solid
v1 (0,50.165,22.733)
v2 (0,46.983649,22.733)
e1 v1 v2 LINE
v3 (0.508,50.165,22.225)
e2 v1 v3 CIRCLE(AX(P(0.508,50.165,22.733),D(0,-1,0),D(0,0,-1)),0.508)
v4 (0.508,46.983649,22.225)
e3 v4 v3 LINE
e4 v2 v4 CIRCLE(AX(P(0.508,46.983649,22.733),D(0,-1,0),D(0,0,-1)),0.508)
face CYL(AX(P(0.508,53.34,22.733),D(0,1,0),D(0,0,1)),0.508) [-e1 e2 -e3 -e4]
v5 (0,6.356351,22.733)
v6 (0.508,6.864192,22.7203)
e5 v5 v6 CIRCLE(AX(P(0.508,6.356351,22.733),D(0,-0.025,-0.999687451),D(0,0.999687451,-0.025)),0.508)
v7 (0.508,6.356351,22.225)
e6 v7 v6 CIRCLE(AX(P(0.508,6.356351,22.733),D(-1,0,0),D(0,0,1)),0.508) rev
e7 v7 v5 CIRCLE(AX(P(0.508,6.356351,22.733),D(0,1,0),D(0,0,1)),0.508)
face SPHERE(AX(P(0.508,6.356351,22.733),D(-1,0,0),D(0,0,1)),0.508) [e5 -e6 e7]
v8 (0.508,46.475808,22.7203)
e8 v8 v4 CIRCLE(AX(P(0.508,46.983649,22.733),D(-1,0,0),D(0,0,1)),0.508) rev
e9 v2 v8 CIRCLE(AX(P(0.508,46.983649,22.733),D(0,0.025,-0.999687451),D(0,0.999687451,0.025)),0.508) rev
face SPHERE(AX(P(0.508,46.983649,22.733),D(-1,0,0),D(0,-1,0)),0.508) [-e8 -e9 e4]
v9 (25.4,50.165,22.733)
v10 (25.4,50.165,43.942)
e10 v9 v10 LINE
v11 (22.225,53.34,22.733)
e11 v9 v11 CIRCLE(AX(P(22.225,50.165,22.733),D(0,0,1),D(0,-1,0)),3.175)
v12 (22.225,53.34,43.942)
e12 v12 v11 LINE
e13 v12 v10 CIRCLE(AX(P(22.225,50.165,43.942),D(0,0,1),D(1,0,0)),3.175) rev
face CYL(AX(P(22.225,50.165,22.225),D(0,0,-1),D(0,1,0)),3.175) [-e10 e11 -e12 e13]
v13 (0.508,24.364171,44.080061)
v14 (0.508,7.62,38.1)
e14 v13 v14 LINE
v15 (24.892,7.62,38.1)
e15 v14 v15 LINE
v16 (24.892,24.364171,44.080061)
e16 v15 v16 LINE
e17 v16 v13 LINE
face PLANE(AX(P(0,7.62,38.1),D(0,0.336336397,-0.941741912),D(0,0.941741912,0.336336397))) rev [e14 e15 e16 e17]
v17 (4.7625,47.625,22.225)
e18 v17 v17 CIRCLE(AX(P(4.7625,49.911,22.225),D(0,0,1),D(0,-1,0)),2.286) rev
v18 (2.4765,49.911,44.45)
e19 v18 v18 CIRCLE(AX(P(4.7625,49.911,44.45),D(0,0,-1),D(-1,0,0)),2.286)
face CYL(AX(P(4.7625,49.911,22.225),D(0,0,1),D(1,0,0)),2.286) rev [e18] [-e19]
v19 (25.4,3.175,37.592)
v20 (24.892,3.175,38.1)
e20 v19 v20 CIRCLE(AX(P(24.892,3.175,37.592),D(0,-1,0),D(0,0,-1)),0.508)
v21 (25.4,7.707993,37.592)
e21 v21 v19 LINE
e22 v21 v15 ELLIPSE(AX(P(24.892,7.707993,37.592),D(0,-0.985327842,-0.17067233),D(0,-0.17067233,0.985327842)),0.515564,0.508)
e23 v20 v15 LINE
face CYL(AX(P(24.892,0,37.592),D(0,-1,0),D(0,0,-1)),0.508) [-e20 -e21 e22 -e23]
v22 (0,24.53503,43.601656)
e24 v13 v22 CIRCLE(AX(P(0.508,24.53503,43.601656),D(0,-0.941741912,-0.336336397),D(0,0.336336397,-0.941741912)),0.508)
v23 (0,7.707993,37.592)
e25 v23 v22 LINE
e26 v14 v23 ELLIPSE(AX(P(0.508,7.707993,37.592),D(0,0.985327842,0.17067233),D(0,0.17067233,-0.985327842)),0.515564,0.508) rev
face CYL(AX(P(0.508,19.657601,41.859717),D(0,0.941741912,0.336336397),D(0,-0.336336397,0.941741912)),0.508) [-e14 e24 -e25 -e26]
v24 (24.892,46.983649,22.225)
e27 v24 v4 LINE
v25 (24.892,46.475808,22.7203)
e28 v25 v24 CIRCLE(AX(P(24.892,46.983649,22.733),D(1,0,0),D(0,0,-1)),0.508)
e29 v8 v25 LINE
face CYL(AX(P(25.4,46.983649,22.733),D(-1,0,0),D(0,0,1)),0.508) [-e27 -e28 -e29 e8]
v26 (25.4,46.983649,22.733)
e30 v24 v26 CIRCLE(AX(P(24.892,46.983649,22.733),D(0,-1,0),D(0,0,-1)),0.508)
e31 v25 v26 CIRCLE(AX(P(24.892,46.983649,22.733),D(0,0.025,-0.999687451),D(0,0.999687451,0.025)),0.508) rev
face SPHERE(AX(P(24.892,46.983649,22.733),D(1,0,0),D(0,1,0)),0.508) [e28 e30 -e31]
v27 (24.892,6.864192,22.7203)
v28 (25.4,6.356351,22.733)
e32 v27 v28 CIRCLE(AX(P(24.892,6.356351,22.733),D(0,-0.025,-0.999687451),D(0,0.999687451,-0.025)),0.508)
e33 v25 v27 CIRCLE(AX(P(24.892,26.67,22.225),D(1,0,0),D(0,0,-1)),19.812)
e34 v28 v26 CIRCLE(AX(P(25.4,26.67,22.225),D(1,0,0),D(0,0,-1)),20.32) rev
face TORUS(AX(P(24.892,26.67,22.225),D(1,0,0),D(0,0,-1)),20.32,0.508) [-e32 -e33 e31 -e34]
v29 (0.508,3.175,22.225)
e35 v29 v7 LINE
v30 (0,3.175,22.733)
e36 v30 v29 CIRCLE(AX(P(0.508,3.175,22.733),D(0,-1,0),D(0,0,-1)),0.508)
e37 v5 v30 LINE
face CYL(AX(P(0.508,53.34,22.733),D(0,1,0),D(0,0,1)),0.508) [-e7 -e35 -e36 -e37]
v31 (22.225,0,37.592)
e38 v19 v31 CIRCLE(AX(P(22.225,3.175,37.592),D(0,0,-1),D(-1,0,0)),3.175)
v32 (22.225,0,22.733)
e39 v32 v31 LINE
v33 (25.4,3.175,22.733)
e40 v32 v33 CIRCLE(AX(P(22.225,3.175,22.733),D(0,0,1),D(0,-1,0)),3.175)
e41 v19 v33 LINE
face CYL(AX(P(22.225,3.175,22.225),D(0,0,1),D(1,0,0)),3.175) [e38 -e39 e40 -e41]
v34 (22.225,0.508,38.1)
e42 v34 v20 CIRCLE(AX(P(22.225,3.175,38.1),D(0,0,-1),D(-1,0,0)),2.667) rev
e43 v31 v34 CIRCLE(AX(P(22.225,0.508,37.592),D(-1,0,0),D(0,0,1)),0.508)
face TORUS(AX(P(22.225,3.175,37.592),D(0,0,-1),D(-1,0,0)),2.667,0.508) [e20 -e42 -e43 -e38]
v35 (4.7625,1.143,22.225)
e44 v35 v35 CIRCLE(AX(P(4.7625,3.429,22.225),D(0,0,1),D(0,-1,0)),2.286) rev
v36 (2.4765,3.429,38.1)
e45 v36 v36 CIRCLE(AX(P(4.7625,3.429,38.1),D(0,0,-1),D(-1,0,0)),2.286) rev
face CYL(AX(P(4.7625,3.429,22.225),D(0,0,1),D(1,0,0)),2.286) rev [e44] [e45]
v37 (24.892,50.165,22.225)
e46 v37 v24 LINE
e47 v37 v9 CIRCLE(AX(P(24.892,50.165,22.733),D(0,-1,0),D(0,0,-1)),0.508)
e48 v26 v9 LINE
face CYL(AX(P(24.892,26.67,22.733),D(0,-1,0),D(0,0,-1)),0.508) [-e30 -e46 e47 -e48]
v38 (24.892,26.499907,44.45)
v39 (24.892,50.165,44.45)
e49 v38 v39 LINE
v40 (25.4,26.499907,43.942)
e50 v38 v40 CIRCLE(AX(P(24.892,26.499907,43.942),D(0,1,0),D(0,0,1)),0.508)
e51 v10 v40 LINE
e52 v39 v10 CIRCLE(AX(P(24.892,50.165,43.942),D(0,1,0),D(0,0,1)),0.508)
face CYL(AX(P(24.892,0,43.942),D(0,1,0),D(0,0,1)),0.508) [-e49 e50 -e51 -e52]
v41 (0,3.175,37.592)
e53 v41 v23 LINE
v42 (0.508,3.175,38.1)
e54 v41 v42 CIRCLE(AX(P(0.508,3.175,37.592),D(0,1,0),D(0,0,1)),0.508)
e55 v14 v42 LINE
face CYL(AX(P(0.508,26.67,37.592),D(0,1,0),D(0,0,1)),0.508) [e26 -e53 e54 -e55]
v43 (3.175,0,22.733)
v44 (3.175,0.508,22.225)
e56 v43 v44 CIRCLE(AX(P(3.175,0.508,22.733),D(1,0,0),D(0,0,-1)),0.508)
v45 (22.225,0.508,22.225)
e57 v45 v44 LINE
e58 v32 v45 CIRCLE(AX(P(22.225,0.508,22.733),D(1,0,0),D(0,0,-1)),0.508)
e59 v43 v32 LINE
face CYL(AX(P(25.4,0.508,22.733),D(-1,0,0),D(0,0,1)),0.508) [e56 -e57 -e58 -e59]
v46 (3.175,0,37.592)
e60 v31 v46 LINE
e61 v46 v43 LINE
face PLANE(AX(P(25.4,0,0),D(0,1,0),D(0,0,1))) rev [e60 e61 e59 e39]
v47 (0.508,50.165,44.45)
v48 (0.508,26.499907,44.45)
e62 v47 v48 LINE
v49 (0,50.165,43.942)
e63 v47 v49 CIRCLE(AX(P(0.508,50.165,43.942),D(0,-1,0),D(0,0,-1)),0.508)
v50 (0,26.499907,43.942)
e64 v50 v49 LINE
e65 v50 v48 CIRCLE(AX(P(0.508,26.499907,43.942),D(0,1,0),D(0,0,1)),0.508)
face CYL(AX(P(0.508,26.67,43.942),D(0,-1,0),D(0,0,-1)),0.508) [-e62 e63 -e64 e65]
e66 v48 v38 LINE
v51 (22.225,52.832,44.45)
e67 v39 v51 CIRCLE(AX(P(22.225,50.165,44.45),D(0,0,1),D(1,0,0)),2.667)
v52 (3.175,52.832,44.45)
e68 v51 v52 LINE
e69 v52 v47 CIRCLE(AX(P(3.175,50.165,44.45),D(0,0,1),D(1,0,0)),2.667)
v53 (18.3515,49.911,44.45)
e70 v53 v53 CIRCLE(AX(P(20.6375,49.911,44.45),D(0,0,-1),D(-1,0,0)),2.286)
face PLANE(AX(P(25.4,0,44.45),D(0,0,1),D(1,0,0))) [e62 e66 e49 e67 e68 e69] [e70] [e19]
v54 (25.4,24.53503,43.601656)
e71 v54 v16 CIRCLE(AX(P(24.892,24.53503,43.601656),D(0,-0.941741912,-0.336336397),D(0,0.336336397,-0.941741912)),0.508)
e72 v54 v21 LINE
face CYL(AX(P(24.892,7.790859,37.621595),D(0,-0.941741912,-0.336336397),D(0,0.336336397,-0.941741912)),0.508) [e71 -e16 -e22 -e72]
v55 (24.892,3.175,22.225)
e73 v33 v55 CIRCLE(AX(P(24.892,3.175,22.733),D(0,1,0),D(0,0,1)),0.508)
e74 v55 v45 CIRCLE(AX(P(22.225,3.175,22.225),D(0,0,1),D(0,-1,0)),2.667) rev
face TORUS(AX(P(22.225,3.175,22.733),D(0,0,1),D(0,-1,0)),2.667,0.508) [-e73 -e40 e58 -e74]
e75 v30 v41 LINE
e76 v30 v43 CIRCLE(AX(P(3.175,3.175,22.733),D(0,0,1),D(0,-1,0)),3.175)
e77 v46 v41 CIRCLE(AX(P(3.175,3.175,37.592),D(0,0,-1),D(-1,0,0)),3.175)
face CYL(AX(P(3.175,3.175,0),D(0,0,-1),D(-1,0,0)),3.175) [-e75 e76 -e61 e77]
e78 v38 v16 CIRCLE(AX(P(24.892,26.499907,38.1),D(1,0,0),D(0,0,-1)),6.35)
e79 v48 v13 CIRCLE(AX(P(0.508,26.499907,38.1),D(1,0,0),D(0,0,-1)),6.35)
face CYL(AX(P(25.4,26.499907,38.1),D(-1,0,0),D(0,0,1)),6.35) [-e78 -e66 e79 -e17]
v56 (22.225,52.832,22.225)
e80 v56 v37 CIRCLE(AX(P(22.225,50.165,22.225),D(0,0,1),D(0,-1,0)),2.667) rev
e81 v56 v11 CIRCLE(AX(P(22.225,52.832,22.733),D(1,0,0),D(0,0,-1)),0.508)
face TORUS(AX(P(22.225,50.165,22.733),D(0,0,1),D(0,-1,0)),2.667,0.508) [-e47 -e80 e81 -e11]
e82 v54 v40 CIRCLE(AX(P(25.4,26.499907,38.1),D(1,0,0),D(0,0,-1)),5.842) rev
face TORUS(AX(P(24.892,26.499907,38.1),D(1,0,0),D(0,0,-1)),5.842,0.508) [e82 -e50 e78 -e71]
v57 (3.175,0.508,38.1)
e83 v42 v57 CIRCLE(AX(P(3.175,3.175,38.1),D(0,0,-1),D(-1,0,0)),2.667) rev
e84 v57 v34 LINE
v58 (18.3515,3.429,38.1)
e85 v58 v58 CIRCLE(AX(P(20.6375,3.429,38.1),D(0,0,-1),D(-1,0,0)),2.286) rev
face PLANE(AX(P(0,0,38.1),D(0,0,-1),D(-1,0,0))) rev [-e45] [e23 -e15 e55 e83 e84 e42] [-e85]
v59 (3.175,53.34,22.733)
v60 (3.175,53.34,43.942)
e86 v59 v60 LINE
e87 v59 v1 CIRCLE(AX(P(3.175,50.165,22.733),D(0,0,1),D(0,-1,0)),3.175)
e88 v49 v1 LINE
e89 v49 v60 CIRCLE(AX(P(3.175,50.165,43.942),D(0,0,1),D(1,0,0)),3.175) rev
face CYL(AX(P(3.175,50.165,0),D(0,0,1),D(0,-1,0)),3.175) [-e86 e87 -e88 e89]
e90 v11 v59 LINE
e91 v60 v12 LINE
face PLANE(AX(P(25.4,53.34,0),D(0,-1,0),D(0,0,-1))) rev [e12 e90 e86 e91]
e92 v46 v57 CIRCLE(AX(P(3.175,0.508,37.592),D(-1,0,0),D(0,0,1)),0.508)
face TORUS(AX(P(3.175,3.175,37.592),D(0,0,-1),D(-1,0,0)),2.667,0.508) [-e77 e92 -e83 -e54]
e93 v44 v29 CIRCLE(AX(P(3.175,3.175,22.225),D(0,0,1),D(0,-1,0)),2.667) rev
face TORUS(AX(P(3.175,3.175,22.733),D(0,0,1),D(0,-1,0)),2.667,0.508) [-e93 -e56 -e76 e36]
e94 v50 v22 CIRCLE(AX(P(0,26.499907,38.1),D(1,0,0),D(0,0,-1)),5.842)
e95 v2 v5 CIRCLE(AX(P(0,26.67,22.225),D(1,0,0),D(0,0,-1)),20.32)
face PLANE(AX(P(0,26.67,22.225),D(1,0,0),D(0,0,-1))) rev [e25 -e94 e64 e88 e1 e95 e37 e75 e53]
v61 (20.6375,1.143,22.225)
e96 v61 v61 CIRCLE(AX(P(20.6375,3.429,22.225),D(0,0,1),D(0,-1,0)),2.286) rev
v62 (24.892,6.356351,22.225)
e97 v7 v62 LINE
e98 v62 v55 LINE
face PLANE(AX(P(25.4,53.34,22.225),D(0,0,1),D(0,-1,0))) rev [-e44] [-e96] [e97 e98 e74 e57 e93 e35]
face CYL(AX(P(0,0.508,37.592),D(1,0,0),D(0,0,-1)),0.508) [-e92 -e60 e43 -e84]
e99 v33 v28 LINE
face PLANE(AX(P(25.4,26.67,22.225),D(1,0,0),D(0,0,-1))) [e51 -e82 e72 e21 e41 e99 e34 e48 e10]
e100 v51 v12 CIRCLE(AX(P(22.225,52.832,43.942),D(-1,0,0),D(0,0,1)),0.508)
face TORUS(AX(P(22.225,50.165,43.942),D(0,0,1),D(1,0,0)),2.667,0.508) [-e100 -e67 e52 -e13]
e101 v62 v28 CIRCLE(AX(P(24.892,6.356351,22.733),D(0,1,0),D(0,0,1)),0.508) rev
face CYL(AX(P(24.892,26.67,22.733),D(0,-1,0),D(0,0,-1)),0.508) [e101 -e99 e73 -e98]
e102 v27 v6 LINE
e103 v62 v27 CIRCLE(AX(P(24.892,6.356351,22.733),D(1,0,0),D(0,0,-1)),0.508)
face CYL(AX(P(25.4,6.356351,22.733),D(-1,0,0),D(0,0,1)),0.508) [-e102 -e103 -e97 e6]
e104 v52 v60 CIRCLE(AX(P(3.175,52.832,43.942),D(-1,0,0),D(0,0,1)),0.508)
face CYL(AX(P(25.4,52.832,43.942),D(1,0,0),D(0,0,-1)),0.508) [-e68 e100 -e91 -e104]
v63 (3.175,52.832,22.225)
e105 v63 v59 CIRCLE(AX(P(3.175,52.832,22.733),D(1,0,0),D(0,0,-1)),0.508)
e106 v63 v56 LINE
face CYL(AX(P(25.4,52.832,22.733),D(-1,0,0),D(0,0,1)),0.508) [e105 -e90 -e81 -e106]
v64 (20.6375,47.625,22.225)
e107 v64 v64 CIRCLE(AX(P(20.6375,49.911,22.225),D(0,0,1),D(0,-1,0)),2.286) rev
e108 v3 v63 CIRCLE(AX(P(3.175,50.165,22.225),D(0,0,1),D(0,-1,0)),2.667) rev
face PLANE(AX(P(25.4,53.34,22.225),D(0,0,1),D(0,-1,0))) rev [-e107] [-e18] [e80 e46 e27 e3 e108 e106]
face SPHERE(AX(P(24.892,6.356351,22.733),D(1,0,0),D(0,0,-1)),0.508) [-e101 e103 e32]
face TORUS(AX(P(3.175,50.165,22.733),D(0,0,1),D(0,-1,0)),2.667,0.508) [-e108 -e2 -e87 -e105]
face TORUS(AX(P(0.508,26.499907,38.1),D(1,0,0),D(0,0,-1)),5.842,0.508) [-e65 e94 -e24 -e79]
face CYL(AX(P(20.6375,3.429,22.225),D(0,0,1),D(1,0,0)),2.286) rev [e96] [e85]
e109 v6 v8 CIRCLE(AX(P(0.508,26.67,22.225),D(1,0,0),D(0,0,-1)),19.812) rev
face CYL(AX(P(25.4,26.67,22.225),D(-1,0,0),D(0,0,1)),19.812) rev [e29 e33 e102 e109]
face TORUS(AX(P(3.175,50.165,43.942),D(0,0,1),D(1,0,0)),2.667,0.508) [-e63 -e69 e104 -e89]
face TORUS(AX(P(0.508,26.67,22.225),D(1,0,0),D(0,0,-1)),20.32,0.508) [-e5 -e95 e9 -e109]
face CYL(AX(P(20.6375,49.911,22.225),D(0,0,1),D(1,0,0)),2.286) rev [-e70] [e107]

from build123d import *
from build123d.topology import SkipClean

# Parameters (mm, degrees)
BOSS_EXTRUDE1_DEPTH       = 25.4
F_8_0_18_DIAMETER_HOLE1_D = 4.572
SKETCH8_W                 = 22.225
SKETCH8_H                 = 53.34
CUT_EXTRUDE1_DEPTH        = 74.933200255
CUT_EXTRUDE2_DEPTH        = 74.933200255
FILLET1_R                 = 3.175
FILLET3_R                 = 0.508
FILLET4_R                 = 6.35


with BuildPart() as part:
    # Sketch1 → Boss-Extrude1 (new body)
    with BuildSketch(Plane(origin=(0, 0, 0), x_dir=(0, 0, -1), z_dir=(1, 0, 0))):
        with BuildLine():
            Line((0, 0), (0, 53.34))
            Line((0, 53.34), (-22.225, 53.34))
            Line((-22.225, 53.34), (-22.225, 46.482))
            ThreePointArc((-22.225, 46.482), (-2.413, 26.67), (-22.225, 6.858))
            Line((-22.225, 6.858), (-22.225, 0))
            Line((-22.225, 0), (0, 0))
        make_face()
    boss_extrude1 = extrude(amount=BOSS_EXTRUDE1_DEPTH)

    # #8 (0.18) Diameter Hole1 (through all)
    with Locations(Plane.XY.offset(22.225)):
        with Locations((4.7625, 49.911), (20.6375, 49.911), (20.6375, 3.429), (4.7625, 3.429)):
            f_8_0_18_diameter_hole1 = Hole(F_8_0_18_DIAMETER_HOLE1_D / 2)

    # Mirror1: Boss-Extrude1, #8 (0.18) Diameter Hole1 across plane
    with SkipClean():  # the faces are left unmerged after this step: merging them gives an invalid solid
        add(boss_extrude1.mirror(Plane(origin=(25.4, 53.34, 22.225), x_dir=(1, 0, 0), z_dir=(0, 0, -1))))
        add(f_8_0_18_diameter_hole1.mirror(Plane(origin=(25.4, 53.34, 22.225), x_dir=(1, 0, 0), z_dir=(0, 0, -1))), mode=Mode.SUBTRACT)

    # Sketch8 → Cut-Extrude1 (cut, through all)
    with BuildSketch(Plane.ZY):
        with Locations((11.1125, 26.67)):
            Rectangle(SKETCH8_W, SKETCH8_H)
    extrude(amount=-CUT_EXTRUDE1_DEPTH, mode=Mode.SUBTRACT)

    # Sketch9 → Cut-Extrude2 (cut, through all)
    with BuildSketch(Plane(origin=(25.4, 0, 0), x_dir=(0, 0, -1), z_dir=(1, 0, 0))):
        Polygon((-44.45, 0), (-38.1, 0), (-38.1, 7.62), (-44.45, 25.4), align=None)
    extrude(amount=-CUT_EXTRUDE2_DEPTH, mode=Mode.SUBTRACT)

    # Fillet1
    fillet1_edges = [part.edges().sort_by_distance(p)[0] for p in [
        (0, 0, 30.1625),
        (25.4, 0, 30.1625),
        (0, 53.34, 33.3375),
        (25.4, 53.34, 33.3375),
    ]]
    fillet(fillet1_edges, radius=FILLET1_R)

    # Fillet3
    fillet3_edges = [part.edges().sort_by_distance(p)[0] for p in [
        (0, 37.7825, 44.45),
        (25.4, 37.7825, 44.45),
        (0, 16.51, 41.275),
        (25.4, 16.51, 41.275),
        (12.7, 0, 38.1),
        (12.7, 0, 22.225),
        (25.4, 5.0165, 22.225),
        (0, 5.0165, 22.225),
        (24.47006403, 0.92993597, 22.225),
        (0.92993597, 0.92993597, 22.225),
        (0, 5.3975, 38.1),
        (25.4, 5.3975, 38.1),
        (24.47006403, 0.92993597, 38.1),
        (0.92993597, 0.92993597, 38.1),
        (12.7, 53.34, 44.45),
        (0.92993597, 52.41006403, 44.45),
        (24.47006403, 52.41006403, 44.45),
        (12.7, 53.34, 22.225),
        (0.92993597, 52.41006403, 22.225),
        (24.47006403, 52.41006403, 22.225),
        (25.4, 26.67, 42.037),
        (0, 26.67, 42.037),
        (0, 48.3235, 22.225),
        (12.7, 46.482, 22.225),
        (25.4, 48.3235, 22.225),
        (12.7, 6.858, 22.225),
    ]]
    fillet(fillet3_edges, radius=FILLET3_R)

    # Fillet4
    # the kernel refuses this fillet: 6.35 mm, written as the material it takes off along each edge
    with BuildSketch(Plane(origin=(25.4, 26.499907309, 38.1), x_dir=(0, 0, 1), z_dir=(0, 1, 0))) as fillet4_piece_1:
        with BuildLine():
            CenterArc((5.842, -0.508), 0.508, 0, 90)
            Line((6.35, -0.508), (6.35, 0))
            Line((6.35, 0), (5.842, 0))
        make_face()
    revolve(axis=Axis((25.4, 26.499907309, 38.1), (1, 0, 0)), revolution_arc=19.653824058, mode=Mode.SUBTRACT)
    with BuildSketch(Plane(origin=(0, 26.499907309, 38.1), x_dir=(0, -0.3363363969981563, 0.9417419115948376), z_dir=(0, -0.9417419115948376, -0.3363363969981563))) as fillet4_piece_2:
        with BuildLine():
            CenterArc((5.842, -0.508), 0.508, 0, 90)
            Line((6.35, -0.508), (6.35, 0))
            Line((6.35, 0), (5.842, 0))
        make_face()
    revolve(axis=Axis((0, 26.499907309, 38.1), (-1, 0, 0)), revolution_arc=19.653824058, mode=Mode.SUBTRACT)
    with BuildSketch(Plane(origin=(25.4, 25.4, 44.45), x_dir=(0, 1, 0), z_dir=(-1, 0, 0))) as fillet4_piece_3:
        with BuildLine():
            CenterArc((FILLET4_R * 0.173213749464, FILLET4_R), FILLET4_R, 250.346175942, 19.653824058)
            Line((-FILLET4_R * 0.163122647534, FILLET4_R * 0.0582580884052), (0, 0))
            Line((0, 0), (FILLET4_R * 0.173213749464, 0))
        make_face()
    extrude(amount=25.4, mode=Mode.SUBTRACT)


solid = part.part
